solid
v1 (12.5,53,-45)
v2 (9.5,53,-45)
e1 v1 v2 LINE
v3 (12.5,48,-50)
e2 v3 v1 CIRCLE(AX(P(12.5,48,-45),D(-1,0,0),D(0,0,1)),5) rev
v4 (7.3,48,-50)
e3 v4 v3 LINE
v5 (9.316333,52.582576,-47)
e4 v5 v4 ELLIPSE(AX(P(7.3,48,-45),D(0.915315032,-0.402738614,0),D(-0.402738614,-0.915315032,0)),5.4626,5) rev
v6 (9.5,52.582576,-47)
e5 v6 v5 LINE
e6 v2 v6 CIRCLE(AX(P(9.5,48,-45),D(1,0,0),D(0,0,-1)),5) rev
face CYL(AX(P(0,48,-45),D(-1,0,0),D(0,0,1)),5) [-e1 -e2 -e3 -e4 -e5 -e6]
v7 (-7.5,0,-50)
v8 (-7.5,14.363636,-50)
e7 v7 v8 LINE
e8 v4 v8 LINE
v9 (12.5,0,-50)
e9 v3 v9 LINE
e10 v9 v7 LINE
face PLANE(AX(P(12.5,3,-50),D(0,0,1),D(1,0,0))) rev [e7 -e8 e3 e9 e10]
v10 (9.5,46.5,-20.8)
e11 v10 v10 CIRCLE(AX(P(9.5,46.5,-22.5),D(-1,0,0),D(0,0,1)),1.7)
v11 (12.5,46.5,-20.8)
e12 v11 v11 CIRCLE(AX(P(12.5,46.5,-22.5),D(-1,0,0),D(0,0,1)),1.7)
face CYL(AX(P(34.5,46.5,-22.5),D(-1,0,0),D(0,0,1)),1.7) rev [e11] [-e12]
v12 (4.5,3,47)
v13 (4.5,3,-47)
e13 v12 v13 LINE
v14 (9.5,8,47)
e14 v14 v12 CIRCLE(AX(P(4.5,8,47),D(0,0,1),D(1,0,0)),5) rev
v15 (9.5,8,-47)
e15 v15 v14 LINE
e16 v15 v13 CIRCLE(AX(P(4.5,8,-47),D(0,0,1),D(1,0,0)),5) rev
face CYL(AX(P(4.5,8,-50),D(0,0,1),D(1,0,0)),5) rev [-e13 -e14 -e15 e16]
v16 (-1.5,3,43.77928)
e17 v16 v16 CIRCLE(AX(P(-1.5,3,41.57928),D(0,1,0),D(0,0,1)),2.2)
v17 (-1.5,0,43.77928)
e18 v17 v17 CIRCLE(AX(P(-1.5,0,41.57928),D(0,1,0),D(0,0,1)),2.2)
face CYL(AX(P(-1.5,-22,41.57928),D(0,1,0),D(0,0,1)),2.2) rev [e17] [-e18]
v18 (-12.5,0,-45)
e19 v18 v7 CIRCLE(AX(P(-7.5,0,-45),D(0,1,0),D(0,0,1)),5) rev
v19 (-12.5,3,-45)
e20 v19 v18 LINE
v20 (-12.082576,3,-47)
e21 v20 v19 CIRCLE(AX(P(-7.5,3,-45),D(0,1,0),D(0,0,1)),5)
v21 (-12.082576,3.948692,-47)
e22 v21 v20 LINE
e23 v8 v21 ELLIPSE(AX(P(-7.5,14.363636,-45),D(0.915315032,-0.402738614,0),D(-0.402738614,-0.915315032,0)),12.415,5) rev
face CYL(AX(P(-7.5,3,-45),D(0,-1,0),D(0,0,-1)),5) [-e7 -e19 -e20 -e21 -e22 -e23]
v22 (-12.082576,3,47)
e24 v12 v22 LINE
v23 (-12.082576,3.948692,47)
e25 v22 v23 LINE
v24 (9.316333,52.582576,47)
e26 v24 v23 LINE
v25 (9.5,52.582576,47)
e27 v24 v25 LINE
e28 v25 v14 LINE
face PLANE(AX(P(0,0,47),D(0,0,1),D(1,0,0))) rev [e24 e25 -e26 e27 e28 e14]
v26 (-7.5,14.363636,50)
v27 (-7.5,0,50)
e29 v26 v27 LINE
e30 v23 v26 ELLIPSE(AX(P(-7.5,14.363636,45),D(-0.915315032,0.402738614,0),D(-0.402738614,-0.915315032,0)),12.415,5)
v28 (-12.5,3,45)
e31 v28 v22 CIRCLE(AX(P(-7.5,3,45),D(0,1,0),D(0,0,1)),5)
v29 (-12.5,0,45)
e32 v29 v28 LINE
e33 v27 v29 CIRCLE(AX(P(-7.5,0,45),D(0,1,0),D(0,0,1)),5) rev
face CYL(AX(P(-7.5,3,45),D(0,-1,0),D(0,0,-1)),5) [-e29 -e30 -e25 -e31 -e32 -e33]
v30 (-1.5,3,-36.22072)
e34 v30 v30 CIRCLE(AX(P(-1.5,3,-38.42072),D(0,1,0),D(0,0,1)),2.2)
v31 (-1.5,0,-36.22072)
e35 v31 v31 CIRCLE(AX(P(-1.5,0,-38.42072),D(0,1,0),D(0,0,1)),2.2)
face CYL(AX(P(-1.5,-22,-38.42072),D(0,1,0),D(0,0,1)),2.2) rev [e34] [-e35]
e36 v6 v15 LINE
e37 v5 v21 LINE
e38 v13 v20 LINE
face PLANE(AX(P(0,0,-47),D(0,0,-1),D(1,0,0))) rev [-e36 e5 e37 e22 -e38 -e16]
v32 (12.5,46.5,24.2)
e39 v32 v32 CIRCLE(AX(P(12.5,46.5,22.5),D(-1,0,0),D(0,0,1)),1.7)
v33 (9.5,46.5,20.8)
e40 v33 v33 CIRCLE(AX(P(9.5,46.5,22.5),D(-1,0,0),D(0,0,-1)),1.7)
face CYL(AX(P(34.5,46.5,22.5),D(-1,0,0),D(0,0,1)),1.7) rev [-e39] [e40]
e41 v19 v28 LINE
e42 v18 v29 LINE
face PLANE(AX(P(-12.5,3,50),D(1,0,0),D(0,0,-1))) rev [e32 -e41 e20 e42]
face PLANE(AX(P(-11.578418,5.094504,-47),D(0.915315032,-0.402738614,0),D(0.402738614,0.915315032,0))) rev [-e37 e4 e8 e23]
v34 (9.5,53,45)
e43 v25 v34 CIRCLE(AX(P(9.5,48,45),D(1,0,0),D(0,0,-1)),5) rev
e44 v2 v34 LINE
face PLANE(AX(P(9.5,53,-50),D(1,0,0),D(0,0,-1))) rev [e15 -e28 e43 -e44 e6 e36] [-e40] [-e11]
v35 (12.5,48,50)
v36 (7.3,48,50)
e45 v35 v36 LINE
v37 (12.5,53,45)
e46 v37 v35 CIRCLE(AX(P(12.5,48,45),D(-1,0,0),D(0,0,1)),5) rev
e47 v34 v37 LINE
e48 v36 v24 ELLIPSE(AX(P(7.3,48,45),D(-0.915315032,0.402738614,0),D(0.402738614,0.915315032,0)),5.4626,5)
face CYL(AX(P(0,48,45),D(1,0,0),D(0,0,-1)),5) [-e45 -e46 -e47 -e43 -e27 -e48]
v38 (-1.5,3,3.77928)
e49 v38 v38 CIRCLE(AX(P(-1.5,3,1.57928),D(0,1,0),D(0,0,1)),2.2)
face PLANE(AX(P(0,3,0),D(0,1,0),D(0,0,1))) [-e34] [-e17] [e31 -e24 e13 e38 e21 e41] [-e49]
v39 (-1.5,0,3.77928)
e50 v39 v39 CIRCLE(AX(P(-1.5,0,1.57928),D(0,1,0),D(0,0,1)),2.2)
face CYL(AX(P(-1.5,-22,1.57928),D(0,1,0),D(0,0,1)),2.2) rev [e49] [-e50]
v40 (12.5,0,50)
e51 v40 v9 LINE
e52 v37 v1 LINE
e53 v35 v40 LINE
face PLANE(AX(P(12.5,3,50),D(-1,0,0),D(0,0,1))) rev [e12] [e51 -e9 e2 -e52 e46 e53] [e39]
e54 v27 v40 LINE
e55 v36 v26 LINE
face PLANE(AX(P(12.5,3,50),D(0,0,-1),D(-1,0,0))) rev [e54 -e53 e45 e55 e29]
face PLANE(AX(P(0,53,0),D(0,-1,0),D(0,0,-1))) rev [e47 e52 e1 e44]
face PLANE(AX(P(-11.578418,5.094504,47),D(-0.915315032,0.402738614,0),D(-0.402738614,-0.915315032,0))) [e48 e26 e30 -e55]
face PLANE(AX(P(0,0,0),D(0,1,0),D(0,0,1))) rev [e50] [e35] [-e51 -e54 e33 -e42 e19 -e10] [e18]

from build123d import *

# Parameters (mm, degrees)
SKETCH1_W           = 25
SKETCH1_H           = 100
BOSS_EXTRUDE1_DEPTH = 3
SKETCH2_W           = 3
SKETCH2_H           = 100
BOSS_EXTRUDE2_DEPTH = 50
SKETCH3_R           = 1.7
CUT_EXTRUDE1_DEPTH  = 25
SKETCH4_R           = 2.2
CUT_EXTRUDE2_DEPTH  = 25
FILLET1_R           = 5
BOSS_EXTRUDE3_DEPTH = 3
FILLET2_R           = 5


with BuildPart() as part:
    # Sketch1 → Boss-Extrude1 (new body)
    with BuildSketch(Plane(origin=(0, 0, 0), x_dir=(1, 0, 0), z_dir=(0, 1, 0))):
        Rectangle(SKETCH1_W, SKETCH1_H)
    extrude(amount=BOSS_EXTRUDE1_DEPTH)

    # Sketch2 → Boss-Extrude2 (add)
    with BuildSketch(Plane(origin=(0, 3, 0), x_dir=(1, 0, 0), z_dir=(0, 1, 0))):
        with Locations((11, 0)):
            Rectangle(SKETCH2_W, SKETCH2_H)
    extrude(amount=BOSS_EXTRUDE2_DEPTH)

    # Sketch3 → Cut-Extrude1 (cut)
    with BuildSketch(Plane.ZY.offset(-9.5)):
        with Locations((-22.5, 46.5)):
            Circle(SKETCH3_R)
        with Locations((22.5, 46.5)):
            Circle(SKETCH3_R)
    extrude(amount=-CUT_EXTRUDE1_DEPTH, mode=Mode.SUBTRACT)

    # Sketch4 → Cut-Extrude2 (cut)
    with BuildSketch(Plane(origin=(0, 3, 0), x_dir=(1, 0, 0), z_dir=(0, 1, 0))):
        with Locations(Location((-1.5, -1.579280152, 0), (0, 0, 270))):
            Circle(SKETCH4_R)
        with Locations(Location((-1.5, 38.420719848, 0), (0, 0, 270))):
            Circle(SKETCH4_R)
        with Locations(Location((-1.5, -41.579280152, 0), (0, 0, 270))):
            Circle(SKETCH4_R)
    extrude(amount=-CUT_EXTRUDE2_DEPTH, mode=Mode.SUBTRACT)

    # Fillet1
    fillet1_edges = [part.edges().sort_by_distance(p)[0] for p in [
        (9.5, 3, 0),
    ]]
    fillet(fillet1_edges, radius=FILLET1_R)

    # Sketch5 → Boss-Extrude3 (add)
    with BuildSketch(Plane.XY.offset(50)):
        with BuildLine():
            Line((9.5, 53), (-12.5, 3))
            Line((-12.5, 3), (4.5, 3))
            ThreePointArc((4.5, 3), (8.035533906, 4.464466094), (9.5, 8))
            Line((9.5, 8), (9.5, 53))
        make_face()
    boss_extrude3 = extrude(amount=-BOSS_EXTRUDE3_DEPTH)

    # Mirror1: Boss-Extrude3 across plane
    add(boss_extrude3.mirror(Plane.XY))

    # Fillet2
    # the kernel refuses this fillet: 5 mm, written as the material it takes off along each edge
    with BuildSketch(Plane(origin=(25, 53, -50), x_dir=(0, 0, 1), z_dir=(-1, 0, 0))) as fillet2_piece_1:
        with BuildLine():
            CenterArc((FILLET2_R, -FILLET2_R), FILLET2_R, 90, 90)
            Line((0, -FILLET2_R), (0, 0))
            Line((0, 0), (FILLET2_R, 0))
        make_face()
    extrude(amount=28, mode=Mode.SUBTRACT)
    with BuildSketch(Plane(origin=(-3, 53, 50), x_dir=(0, -1, 0), z_dir=(1, 0, 0)), Plane(origin=(-12.5, -12.5, -50), x_dir=(0, 0, 1), z_dir=(0, 1, 0)), Plane(origin=(-12.5, -12.5, 50), x_dir=(1, 0, 0), z_dir=(0, 1, 0))) as fillet2_piece_2:
        with BuildLine():
            CenterArc((FILLET2_R, FILLET2_R), FILLET2_R, 180, 90)
            Line((0, FILLET2_R), (0, 0))
            Line((0, 0), (FILLET2_R, 0))
        make_face()
    extrude(amount=28, mode=Mode.SUBTRACT)


solid = part.part
